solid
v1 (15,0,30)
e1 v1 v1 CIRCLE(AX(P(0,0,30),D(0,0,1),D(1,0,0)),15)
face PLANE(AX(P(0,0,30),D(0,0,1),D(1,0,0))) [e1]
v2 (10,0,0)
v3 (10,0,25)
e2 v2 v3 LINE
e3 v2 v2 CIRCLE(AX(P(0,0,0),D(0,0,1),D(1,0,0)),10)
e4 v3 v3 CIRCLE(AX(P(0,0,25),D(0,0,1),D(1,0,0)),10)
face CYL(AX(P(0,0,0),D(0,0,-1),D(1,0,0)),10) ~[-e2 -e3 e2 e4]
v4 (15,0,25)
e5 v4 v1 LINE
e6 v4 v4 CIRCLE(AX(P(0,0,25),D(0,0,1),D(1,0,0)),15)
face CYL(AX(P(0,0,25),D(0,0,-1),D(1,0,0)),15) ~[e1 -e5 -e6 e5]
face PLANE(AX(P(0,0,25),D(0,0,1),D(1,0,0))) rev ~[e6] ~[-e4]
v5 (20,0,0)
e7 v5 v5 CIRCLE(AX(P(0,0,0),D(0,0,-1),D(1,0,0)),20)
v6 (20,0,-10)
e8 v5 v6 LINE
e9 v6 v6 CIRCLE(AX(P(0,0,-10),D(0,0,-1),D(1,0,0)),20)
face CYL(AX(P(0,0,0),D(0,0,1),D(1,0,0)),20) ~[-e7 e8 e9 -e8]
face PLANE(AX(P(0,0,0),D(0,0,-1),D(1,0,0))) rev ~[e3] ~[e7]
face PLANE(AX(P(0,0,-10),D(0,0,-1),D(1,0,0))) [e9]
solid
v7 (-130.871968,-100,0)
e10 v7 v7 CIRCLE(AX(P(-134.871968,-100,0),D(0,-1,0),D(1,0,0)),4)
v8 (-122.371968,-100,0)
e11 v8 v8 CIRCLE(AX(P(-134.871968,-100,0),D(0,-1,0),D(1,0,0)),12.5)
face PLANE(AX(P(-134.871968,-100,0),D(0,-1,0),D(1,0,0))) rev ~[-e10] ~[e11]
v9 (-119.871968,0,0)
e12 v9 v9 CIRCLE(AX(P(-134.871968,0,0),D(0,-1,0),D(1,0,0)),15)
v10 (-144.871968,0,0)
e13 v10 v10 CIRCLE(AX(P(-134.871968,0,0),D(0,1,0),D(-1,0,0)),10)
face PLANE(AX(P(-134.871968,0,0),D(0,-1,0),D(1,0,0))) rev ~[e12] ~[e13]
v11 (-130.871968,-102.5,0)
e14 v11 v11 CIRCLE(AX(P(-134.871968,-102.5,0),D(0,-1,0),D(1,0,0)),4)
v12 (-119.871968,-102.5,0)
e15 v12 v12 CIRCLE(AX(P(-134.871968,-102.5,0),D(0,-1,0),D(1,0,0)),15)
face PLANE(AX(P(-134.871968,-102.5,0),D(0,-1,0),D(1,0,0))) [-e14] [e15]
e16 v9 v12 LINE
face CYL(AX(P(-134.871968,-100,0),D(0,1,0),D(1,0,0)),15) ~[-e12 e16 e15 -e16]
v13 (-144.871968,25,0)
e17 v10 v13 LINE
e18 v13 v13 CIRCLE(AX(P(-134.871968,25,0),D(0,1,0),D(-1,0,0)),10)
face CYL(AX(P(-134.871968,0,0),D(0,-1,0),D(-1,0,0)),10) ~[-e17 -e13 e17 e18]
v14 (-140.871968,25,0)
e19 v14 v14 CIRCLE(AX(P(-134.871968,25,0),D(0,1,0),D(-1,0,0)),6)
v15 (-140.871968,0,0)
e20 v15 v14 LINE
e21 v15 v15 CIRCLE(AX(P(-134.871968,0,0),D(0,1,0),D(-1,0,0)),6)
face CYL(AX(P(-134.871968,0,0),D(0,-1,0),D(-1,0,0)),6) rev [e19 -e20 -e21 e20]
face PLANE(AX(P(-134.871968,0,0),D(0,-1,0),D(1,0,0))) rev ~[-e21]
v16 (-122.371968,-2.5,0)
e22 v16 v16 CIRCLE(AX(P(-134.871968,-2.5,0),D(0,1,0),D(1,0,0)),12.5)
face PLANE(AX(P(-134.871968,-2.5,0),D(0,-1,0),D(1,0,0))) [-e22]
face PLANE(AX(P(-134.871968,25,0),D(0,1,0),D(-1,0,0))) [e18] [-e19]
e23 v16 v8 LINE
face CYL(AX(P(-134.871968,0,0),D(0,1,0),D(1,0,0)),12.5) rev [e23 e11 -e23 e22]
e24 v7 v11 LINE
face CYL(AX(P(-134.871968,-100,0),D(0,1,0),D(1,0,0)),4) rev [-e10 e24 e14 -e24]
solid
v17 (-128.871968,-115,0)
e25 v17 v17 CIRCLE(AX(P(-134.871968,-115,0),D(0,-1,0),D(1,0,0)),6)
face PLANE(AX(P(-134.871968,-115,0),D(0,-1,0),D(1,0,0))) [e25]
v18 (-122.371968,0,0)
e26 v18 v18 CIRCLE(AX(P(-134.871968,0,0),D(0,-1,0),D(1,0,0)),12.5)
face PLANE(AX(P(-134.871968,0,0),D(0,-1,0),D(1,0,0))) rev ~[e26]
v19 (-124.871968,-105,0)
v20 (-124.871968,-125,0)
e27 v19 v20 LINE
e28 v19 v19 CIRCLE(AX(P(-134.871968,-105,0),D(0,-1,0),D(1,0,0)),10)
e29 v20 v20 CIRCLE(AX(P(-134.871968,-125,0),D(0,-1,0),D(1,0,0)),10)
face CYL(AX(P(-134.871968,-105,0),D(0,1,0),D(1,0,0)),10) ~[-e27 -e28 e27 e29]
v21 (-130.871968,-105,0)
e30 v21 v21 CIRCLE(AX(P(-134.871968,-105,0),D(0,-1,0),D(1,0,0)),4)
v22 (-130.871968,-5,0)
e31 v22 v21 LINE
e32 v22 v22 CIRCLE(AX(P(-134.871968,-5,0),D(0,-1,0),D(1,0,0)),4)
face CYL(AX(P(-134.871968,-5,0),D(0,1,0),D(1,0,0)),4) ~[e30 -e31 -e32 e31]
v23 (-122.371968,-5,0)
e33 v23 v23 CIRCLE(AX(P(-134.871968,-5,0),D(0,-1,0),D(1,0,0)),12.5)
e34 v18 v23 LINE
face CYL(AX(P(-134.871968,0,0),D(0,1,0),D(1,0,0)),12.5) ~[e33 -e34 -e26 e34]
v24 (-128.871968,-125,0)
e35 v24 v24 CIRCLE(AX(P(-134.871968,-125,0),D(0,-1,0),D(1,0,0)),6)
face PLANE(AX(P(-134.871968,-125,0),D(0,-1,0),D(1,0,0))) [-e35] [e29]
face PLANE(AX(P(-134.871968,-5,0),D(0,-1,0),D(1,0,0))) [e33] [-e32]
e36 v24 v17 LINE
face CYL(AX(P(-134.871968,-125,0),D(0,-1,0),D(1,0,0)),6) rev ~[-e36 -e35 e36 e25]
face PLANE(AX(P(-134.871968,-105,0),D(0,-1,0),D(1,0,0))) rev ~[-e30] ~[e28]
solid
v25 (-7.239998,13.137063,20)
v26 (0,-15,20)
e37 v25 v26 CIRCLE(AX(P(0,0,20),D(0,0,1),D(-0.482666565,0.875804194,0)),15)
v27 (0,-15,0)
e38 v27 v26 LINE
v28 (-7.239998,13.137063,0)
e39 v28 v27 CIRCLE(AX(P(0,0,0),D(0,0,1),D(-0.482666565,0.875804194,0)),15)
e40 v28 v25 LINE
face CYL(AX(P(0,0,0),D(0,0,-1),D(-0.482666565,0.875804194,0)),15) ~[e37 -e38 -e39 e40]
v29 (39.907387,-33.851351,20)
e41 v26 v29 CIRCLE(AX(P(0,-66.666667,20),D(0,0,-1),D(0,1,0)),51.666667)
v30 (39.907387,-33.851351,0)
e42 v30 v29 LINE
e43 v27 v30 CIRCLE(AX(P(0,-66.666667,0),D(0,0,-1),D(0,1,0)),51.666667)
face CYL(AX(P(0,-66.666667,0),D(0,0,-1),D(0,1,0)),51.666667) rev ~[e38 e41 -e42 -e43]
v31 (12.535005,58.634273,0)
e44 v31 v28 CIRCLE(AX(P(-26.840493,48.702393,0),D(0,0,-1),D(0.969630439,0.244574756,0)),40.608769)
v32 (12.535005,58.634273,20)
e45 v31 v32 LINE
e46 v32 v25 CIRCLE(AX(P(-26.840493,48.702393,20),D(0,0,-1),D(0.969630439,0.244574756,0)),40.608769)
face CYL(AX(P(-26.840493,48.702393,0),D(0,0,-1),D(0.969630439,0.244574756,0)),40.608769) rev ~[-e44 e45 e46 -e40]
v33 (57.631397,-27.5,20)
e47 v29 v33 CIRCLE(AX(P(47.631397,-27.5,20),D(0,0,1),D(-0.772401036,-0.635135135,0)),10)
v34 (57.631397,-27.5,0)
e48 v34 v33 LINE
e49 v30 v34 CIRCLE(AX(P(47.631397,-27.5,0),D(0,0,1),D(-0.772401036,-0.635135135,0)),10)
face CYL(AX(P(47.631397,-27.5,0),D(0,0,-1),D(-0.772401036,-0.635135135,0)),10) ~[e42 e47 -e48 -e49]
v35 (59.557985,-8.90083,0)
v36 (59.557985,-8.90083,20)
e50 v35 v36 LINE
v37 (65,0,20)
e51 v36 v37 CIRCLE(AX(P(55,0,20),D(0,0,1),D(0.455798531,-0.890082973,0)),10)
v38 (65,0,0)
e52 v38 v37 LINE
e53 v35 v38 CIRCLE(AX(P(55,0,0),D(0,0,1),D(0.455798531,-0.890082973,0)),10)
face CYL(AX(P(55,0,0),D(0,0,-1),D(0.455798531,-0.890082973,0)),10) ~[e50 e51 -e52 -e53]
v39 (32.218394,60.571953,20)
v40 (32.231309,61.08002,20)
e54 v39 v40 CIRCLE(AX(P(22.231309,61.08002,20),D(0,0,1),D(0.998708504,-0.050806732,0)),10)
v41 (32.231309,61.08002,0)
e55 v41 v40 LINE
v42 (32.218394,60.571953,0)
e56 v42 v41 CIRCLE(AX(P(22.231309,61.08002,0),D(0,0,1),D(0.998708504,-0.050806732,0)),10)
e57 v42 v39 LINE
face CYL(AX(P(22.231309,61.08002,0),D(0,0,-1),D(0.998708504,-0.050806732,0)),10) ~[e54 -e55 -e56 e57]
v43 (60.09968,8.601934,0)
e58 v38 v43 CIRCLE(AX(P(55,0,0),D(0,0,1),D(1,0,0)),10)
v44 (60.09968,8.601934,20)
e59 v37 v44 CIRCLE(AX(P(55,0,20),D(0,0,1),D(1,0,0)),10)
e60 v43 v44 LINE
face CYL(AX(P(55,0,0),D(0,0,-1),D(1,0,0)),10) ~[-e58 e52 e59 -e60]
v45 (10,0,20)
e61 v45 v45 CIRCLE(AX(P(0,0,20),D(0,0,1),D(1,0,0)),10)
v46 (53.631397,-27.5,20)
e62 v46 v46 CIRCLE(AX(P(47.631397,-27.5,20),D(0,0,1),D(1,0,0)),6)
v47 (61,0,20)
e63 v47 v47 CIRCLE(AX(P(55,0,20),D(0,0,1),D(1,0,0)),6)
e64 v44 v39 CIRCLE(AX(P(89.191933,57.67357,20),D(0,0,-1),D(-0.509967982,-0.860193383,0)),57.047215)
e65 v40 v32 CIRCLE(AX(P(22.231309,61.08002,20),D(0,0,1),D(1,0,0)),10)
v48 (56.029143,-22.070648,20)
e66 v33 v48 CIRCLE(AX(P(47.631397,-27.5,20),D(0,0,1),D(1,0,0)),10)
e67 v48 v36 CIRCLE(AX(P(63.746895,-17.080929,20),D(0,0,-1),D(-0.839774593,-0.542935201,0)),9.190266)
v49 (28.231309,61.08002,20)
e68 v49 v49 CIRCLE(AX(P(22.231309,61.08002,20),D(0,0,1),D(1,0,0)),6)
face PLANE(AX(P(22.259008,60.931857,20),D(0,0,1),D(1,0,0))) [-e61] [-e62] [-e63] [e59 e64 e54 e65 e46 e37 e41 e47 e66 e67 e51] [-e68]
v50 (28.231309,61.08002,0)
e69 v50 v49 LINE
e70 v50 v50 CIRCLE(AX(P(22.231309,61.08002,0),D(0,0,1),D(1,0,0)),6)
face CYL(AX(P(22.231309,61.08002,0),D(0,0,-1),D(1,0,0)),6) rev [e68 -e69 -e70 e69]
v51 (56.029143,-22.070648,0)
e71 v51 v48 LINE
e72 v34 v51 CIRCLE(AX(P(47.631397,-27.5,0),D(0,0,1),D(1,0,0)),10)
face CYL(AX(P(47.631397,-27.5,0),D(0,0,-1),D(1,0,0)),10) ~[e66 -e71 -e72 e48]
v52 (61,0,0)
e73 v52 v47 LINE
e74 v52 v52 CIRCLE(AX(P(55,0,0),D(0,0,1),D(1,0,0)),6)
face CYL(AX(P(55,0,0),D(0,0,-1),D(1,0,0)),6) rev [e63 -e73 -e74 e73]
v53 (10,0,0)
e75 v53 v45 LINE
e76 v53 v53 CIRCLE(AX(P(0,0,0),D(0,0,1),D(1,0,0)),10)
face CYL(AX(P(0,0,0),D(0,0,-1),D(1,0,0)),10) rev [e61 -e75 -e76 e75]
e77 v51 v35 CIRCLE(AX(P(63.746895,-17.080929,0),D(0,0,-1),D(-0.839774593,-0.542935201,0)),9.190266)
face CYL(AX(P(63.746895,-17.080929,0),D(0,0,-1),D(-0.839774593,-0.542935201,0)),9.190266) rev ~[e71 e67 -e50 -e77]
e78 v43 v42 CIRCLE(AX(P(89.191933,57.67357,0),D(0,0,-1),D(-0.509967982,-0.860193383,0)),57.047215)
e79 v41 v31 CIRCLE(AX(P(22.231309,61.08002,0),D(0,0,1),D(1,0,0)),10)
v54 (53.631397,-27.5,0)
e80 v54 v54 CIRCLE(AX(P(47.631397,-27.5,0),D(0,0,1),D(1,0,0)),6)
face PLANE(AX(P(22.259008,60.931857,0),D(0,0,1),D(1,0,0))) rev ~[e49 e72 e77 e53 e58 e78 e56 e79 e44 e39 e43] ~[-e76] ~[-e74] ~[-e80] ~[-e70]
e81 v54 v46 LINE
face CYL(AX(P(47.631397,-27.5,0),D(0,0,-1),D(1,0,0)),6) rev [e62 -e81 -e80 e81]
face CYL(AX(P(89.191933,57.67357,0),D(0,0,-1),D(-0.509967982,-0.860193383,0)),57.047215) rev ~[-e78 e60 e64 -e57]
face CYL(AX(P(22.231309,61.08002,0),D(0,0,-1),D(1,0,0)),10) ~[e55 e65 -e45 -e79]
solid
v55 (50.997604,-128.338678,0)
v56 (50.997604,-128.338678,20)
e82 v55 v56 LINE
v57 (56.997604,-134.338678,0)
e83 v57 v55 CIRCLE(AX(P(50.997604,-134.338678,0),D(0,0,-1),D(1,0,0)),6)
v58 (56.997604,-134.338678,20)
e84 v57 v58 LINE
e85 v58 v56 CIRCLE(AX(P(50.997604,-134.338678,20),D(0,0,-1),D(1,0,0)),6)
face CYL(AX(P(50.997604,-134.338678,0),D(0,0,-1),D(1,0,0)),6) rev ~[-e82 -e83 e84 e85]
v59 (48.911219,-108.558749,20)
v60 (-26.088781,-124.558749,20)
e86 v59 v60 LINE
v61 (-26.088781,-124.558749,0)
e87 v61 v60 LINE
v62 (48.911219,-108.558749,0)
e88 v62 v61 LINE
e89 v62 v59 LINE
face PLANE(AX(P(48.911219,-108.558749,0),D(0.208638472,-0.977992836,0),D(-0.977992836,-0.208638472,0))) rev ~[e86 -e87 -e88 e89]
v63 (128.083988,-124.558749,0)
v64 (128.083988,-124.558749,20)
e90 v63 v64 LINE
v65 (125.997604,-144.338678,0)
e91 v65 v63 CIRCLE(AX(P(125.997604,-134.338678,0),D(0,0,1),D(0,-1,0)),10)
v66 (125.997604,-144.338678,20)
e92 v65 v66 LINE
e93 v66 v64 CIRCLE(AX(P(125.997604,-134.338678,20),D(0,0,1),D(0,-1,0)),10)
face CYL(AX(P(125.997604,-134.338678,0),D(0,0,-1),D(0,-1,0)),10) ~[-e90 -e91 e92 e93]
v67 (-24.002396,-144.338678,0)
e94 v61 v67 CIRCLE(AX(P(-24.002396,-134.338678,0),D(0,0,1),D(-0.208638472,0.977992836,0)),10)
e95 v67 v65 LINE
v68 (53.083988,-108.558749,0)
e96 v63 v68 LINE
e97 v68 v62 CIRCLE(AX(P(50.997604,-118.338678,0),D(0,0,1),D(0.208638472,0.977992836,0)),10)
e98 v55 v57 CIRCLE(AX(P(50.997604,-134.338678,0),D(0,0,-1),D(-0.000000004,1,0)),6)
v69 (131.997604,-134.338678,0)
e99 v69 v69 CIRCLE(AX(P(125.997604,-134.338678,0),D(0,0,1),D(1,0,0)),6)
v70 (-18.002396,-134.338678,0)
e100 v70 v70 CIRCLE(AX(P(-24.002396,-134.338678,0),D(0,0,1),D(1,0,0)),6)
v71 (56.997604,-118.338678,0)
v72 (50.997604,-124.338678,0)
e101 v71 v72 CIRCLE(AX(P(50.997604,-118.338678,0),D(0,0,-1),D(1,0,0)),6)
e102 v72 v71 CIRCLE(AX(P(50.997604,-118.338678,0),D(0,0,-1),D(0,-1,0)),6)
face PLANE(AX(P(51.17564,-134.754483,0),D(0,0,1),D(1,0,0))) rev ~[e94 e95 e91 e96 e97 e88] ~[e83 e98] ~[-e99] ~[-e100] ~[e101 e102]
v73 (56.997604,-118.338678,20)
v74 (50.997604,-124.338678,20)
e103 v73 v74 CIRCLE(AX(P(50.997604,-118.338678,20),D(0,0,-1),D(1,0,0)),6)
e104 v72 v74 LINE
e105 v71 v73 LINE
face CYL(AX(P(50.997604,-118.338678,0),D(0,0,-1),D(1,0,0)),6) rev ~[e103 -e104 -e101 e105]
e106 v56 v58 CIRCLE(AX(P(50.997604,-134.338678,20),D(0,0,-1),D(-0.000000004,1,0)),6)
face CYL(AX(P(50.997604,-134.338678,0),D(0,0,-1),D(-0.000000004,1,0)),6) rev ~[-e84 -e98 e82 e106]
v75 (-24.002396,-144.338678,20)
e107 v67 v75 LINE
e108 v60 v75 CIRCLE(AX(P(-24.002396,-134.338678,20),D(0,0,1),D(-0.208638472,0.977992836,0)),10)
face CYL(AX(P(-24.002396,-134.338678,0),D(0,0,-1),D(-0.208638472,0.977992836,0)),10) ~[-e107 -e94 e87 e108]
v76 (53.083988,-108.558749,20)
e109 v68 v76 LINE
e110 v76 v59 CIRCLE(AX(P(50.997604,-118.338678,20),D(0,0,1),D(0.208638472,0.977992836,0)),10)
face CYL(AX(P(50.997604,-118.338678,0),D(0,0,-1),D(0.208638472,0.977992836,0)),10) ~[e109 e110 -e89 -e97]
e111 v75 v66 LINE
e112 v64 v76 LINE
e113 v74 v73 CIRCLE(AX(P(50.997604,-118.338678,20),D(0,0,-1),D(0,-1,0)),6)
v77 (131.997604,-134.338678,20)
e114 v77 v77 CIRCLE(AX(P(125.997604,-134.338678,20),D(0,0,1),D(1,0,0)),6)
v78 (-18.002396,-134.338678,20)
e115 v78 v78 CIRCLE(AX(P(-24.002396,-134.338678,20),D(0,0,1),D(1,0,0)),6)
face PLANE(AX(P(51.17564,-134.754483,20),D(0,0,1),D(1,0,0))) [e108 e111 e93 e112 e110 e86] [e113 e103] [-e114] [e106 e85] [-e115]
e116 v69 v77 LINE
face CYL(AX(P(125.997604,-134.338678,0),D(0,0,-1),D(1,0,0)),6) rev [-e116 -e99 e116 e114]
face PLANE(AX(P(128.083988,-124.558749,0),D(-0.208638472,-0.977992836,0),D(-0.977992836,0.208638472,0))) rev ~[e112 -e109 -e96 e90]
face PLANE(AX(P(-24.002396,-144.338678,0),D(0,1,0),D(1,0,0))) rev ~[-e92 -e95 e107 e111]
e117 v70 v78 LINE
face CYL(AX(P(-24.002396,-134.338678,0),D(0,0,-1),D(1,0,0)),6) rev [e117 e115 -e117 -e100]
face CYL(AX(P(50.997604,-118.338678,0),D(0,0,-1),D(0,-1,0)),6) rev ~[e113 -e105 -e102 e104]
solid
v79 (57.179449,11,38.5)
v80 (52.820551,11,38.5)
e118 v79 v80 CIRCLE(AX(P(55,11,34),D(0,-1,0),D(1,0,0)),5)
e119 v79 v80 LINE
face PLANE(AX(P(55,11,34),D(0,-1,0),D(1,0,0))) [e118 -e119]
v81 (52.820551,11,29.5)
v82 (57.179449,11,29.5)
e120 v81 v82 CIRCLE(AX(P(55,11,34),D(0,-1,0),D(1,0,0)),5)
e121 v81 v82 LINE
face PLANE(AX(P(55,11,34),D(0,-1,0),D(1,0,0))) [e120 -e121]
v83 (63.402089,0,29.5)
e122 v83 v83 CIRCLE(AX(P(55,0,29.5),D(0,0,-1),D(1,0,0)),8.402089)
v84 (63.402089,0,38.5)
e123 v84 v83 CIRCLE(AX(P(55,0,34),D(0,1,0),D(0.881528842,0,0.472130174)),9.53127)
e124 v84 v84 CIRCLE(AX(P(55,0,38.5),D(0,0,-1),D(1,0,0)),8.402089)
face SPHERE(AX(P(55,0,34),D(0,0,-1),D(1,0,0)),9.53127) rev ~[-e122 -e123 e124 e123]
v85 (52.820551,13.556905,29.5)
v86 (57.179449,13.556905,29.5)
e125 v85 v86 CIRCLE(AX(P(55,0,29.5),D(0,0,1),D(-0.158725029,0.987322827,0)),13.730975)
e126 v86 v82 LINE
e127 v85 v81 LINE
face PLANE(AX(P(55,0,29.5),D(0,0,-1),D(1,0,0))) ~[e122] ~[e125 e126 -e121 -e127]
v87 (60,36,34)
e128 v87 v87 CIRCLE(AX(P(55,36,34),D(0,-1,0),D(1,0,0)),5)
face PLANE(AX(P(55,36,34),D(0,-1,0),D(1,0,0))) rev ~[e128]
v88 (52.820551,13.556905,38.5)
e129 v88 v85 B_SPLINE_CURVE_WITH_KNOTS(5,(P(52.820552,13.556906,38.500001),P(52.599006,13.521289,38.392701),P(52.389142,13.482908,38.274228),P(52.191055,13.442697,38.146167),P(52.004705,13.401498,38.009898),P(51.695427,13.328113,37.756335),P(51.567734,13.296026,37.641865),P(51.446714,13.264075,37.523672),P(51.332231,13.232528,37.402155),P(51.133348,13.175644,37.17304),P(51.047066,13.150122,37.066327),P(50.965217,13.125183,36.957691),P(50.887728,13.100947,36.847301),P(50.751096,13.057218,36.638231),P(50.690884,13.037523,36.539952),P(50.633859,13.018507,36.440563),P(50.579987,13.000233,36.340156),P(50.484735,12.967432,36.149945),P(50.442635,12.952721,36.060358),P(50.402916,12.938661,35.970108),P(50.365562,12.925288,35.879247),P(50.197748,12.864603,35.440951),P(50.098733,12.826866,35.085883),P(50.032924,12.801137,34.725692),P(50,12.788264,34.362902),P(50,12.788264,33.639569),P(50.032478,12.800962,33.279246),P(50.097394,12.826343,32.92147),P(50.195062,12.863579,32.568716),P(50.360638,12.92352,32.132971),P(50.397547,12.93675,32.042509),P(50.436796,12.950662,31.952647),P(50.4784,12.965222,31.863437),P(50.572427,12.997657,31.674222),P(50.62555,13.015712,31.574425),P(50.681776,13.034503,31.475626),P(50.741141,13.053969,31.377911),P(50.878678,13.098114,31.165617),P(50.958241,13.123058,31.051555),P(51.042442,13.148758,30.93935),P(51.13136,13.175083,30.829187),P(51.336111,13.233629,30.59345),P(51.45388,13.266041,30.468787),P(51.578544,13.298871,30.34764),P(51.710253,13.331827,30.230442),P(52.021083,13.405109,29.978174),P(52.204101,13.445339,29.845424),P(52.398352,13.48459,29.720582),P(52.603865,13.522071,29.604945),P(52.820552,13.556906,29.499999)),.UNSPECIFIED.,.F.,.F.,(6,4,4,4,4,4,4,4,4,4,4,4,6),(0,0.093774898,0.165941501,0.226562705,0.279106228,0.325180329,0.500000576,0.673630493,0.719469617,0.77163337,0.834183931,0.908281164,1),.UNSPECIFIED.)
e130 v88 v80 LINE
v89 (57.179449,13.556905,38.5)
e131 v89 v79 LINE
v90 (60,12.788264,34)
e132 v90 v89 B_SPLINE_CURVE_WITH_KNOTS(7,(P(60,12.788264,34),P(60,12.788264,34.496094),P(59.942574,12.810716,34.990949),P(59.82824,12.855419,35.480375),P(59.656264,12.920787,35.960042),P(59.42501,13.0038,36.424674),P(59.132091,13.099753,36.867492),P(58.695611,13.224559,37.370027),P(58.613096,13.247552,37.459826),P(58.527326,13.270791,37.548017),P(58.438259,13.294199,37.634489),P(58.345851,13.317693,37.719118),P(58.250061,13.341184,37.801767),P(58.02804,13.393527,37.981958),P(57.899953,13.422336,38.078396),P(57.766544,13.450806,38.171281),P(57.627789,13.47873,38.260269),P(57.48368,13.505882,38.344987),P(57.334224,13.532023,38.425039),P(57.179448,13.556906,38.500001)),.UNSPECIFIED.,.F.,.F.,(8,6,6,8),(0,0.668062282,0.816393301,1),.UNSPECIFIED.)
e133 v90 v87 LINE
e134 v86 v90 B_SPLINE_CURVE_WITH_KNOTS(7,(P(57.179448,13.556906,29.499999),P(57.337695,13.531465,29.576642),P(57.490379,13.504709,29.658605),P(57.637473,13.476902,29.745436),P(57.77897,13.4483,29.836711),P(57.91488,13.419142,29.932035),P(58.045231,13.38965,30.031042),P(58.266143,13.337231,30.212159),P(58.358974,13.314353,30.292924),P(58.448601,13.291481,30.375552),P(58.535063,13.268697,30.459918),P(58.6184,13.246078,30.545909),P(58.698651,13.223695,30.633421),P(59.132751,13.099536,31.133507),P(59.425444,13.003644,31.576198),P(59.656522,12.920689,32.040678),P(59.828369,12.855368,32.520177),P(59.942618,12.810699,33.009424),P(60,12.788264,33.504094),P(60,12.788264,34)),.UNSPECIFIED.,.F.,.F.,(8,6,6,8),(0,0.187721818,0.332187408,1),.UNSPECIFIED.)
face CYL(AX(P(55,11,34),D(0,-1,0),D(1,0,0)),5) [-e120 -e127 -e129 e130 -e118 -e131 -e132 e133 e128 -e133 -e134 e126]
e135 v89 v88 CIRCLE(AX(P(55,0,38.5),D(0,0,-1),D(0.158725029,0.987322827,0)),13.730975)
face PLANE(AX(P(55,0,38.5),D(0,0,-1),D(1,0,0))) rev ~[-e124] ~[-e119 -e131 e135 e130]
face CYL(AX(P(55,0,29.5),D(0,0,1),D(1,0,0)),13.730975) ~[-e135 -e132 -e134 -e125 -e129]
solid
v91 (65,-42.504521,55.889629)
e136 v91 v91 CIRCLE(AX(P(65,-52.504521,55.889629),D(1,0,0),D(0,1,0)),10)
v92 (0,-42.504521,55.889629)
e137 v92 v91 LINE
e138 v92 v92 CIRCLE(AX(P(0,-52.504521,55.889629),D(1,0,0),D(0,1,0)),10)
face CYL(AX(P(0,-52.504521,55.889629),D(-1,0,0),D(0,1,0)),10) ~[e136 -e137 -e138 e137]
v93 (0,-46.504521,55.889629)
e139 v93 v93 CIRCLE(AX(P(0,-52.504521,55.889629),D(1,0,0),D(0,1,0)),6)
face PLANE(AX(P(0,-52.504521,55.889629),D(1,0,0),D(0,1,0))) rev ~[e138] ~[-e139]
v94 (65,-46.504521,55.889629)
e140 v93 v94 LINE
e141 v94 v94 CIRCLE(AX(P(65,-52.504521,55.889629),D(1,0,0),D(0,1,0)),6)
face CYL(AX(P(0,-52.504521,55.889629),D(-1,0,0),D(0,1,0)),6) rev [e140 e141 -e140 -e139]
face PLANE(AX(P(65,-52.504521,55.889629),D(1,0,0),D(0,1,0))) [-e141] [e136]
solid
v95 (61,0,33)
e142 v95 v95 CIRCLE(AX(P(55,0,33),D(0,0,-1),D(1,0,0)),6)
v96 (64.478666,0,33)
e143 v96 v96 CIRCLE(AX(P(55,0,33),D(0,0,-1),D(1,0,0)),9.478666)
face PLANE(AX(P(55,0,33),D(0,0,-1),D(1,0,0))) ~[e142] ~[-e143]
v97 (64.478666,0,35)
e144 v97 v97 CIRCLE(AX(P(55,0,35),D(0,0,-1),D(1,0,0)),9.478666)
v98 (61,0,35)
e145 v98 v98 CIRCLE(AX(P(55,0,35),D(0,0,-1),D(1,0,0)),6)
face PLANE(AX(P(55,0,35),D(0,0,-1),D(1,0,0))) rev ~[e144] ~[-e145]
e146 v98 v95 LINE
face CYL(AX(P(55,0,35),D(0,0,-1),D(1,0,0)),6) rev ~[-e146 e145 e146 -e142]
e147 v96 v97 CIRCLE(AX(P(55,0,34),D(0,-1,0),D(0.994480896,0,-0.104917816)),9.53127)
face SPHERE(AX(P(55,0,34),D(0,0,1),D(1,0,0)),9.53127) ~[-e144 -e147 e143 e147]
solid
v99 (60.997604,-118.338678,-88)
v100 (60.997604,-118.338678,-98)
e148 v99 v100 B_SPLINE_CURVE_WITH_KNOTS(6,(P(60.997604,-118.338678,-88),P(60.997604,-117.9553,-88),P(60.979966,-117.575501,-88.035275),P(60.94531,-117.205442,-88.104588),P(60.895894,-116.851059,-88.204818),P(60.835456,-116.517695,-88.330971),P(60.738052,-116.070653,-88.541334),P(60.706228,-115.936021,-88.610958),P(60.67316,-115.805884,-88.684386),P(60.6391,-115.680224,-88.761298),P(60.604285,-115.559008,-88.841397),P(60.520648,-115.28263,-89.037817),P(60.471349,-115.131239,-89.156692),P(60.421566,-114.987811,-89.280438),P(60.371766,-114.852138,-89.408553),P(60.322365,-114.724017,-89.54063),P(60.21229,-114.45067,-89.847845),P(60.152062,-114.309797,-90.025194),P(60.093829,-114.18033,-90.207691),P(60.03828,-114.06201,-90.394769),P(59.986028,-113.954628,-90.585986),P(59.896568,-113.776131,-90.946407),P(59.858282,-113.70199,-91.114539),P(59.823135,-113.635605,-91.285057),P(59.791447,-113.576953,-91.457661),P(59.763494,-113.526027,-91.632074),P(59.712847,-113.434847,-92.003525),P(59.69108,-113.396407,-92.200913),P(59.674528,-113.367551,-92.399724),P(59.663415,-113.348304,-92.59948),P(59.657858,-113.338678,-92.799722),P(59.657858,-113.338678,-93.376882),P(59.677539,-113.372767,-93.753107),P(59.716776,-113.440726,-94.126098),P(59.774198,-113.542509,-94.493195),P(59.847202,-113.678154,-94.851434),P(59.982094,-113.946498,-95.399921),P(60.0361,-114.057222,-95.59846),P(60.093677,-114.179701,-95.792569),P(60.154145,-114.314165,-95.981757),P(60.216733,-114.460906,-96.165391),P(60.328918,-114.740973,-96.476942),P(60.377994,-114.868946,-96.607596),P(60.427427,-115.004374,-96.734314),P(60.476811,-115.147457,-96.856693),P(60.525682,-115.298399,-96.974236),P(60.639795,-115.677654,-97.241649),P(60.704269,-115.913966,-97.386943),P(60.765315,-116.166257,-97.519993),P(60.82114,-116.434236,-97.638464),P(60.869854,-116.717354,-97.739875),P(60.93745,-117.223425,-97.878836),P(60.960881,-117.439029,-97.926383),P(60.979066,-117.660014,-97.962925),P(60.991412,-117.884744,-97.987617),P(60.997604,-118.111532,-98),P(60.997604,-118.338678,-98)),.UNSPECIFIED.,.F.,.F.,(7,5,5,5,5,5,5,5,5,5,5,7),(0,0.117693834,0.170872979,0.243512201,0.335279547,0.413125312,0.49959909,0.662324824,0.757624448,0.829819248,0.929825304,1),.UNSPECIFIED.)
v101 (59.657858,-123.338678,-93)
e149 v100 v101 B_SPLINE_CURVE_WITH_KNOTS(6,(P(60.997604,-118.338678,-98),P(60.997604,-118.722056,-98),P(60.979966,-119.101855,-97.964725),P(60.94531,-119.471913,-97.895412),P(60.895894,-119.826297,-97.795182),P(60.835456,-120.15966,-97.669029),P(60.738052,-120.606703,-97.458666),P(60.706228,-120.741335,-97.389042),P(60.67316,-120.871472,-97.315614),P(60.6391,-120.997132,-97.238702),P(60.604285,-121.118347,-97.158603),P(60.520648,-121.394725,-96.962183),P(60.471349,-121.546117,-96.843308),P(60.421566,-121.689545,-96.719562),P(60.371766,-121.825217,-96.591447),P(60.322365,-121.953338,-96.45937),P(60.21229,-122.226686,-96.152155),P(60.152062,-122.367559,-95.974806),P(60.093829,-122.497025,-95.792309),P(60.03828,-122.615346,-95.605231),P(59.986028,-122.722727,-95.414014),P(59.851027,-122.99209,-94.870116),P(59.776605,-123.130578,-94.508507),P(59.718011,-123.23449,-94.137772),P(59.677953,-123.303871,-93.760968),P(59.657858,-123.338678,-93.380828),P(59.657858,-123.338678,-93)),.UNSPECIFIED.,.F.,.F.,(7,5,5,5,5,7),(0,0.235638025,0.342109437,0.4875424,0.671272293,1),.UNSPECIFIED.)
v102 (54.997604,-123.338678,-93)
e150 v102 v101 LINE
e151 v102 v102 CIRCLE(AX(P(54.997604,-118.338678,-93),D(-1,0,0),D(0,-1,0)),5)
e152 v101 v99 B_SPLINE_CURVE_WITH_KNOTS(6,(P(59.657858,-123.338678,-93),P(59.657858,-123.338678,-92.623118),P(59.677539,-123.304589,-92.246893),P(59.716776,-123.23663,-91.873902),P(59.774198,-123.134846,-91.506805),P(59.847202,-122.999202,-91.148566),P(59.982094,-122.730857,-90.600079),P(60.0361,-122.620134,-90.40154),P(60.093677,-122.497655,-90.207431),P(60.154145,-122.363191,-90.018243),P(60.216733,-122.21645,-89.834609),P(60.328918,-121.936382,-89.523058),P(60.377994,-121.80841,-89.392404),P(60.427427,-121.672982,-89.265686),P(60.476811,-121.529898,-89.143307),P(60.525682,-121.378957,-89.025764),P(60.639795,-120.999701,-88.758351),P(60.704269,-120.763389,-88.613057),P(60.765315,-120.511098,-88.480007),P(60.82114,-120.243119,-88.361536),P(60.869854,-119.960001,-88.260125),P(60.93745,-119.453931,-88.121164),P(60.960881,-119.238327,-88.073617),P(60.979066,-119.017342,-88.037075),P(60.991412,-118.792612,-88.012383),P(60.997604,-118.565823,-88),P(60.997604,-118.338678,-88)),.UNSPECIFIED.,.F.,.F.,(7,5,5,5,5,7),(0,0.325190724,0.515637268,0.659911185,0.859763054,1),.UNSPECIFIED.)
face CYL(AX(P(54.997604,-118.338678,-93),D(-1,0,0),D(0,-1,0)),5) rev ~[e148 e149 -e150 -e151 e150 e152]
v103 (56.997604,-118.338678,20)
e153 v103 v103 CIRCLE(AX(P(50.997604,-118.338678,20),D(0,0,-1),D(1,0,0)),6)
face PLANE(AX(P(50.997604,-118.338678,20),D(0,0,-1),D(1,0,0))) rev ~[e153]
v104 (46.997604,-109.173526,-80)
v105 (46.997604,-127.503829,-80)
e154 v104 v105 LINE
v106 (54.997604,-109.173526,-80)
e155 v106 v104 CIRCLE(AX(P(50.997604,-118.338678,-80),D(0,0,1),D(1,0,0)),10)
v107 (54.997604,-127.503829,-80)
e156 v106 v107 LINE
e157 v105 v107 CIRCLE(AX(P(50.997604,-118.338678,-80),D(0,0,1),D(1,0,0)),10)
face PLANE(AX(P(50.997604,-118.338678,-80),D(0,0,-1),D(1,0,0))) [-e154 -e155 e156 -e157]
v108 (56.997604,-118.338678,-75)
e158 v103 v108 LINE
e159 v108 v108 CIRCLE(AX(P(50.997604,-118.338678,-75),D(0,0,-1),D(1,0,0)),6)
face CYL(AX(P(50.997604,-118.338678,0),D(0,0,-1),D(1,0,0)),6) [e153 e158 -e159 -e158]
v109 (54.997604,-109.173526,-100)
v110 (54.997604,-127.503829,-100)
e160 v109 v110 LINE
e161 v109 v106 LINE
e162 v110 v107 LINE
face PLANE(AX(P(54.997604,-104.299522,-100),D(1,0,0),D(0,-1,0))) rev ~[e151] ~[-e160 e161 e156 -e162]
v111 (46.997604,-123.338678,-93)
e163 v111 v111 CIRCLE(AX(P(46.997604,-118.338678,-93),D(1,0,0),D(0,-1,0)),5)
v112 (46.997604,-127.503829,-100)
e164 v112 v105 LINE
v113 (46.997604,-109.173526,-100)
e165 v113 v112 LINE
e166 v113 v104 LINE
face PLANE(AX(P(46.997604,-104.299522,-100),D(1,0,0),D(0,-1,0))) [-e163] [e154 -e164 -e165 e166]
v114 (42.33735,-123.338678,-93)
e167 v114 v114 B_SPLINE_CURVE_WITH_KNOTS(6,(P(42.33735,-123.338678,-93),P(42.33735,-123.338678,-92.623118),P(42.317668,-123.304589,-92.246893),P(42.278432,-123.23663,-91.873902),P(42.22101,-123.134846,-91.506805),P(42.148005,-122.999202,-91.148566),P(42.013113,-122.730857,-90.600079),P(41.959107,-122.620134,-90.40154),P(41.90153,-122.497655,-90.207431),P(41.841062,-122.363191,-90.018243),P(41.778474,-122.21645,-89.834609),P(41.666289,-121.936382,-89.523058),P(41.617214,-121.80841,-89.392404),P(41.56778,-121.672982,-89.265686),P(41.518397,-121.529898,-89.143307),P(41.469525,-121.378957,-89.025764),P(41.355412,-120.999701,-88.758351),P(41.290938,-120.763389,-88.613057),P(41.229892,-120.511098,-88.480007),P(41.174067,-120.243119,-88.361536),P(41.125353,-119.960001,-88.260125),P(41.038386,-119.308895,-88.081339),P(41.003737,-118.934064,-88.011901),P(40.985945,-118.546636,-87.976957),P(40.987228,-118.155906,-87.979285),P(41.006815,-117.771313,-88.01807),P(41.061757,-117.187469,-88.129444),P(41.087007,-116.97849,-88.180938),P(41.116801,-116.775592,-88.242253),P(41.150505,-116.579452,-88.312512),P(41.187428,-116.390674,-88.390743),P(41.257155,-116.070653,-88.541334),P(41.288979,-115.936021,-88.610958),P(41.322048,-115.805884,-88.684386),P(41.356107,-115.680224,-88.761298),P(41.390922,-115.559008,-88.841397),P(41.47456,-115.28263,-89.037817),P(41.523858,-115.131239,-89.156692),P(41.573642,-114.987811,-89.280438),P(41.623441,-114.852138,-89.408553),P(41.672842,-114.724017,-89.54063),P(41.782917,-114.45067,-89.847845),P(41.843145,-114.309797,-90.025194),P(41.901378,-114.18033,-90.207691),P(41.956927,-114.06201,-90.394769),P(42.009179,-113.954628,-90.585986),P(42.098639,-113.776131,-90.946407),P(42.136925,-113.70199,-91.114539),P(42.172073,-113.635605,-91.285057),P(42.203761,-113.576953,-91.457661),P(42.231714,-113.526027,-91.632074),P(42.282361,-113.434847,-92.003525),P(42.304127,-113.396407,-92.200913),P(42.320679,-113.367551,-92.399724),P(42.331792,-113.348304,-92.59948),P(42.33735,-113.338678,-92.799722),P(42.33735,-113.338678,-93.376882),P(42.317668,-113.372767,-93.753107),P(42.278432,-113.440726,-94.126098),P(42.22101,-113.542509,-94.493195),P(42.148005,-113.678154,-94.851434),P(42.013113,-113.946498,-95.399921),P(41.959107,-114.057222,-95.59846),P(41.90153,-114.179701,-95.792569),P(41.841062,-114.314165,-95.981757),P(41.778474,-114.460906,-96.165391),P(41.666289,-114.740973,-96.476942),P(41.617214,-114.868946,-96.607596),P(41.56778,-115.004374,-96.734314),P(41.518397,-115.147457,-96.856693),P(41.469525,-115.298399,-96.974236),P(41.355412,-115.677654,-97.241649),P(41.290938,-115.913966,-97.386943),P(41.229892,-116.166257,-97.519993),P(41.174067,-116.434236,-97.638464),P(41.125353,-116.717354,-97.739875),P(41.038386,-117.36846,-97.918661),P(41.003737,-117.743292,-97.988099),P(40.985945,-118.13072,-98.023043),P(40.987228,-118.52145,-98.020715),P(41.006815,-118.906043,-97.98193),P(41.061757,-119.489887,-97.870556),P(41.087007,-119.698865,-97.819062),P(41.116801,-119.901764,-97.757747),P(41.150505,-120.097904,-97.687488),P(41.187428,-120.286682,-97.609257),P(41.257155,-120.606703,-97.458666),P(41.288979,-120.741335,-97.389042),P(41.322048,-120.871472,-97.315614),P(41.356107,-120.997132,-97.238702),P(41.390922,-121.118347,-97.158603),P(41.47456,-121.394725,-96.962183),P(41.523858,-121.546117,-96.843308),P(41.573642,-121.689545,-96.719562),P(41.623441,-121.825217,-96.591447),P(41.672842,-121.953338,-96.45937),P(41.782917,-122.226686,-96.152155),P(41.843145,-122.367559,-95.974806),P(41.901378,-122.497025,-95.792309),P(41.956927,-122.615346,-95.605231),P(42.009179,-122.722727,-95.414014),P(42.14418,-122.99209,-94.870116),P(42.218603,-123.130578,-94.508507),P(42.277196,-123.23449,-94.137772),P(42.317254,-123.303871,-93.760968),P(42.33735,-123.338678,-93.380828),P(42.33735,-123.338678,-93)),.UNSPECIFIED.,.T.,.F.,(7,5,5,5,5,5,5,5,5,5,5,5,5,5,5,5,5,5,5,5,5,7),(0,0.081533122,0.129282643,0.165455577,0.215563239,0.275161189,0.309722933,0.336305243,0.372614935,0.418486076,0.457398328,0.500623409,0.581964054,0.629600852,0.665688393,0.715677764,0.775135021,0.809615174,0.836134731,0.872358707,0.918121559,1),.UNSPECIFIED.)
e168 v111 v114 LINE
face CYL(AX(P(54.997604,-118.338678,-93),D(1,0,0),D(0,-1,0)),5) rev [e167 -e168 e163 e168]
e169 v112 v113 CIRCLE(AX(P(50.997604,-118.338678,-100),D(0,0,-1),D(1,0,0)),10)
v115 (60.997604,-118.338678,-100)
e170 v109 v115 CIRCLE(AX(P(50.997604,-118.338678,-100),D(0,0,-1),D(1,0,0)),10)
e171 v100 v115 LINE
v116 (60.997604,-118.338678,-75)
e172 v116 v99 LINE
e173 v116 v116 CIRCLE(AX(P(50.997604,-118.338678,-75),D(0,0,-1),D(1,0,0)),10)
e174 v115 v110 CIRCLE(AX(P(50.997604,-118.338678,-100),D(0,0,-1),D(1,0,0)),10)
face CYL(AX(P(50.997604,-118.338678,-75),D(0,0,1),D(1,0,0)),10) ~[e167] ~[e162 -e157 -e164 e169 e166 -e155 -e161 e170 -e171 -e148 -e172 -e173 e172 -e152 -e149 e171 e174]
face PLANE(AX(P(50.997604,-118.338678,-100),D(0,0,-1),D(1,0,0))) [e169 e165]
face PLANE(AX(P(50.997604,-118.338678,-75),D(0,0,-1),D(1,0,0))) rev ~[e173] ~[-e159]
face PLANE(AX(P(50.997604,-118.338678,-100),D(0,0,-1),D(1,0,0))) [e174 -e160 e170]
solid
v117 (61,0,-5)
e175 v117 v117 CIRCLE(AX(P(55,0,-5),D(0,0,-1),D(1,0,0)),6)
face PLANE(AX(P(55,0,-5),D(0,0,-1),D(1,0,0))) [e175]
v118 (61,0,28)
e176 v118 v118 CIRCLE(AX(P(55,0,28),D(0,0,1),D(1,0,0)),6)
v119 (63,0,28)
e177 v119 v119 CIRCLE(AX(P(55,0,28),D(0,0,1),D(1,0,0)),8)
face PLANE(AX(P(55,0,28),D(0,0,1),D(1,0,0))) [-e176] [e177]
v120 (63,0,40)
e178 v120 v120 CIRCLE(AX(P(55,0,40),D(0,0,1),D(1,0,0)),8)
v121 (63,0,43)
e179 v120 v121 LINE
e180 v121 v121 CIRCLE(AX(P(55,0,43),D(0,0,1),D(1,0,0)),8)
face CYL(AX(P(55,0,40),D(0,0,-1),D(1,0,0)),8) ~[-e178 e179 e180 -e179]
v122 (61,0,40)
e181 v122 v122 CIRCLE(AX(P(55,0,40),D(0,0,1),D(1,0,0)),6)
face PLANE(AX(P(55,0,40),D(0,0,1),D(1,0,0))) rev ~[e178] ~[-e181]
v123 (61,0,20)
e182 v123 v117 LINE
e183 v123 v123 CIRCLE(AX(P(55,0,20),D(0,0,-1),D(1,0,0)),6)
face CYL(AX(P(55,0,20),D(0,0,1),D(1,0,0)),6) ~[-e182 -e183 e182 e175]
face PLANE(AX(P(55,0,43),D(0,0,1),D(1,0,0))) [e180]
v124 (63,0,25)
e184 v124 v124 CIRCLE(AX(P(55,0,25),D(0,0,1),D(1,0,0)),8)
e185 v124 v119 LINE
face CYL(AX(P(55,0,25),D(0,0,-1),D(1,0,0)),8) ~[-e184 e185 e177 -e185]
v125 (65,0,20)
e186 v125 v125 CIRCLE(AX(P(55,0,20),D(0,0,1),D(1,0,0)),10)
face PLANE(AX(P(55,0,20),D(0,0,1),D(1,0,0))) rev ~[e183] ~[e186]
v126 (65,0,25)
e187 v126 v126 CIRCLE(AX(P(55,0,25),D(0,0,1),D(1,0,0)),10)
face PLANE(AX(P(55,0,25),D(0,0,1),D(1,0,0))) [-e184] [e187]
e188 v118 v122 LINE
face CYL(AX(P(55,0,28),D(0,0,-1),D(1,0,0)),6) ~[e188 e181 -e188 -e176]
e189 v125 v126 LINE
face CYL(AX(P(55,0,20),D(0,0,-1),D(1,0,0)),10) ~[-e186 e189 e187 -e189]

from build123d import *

# Parameters (mm, degrees)
F0_R           = 6
F0_R_2         = 10
F1_DEPTH       = 20
F2_R           = 20
F3_DEPTH       = 10
F4_R           = 10
F5_DEPTH       = 25
F6_R           = 15
F7_DEPTH       = 5
F8_R           = 10
F9_DEPTH       = 5
F10_R          = 8
F11_DEPTH      = 3
F12_R          = 6
F13_DEPTH      = 12
F14_R          = 8
F15_DEPTH      = 3
F16_R          = 6
F17_DEPTH      = 25
F23_R          = 5
F24_DEPTH      = 25
F25_R          = 15
F26_DEPTH      = 100
F27_T          = -2.5
F29_R          = 12.5
F30_DEPTH      = 5
F31_R          = 4
F32_DEPTH      = 100
F33_R          = 15
F33_R_2        = 4
F34_DEPTH      = 2.5
F35_R          = 10
F36_DEPTH      = 20
F38_R          = 6
F39_DEPTH      = 20
F40_R          = 6
F41_DEPTH      = 75
F41_DEPTH_BACK = 20
F42_R          = 10
F43_DEPTH      = 25
F44_W          = 8
F44_H          = 28.0783114423
F45_DEPTH      = 20
F46_R          = 5
F47_DEPTH      = 81.001
F47_DEPTH_BACK = 204.8705715287
F48_R          = 6
F49_DEPTH      = 10
F37_R          = 10
F37_R_2        = 6
F50_DEPTH      = 25
F51_R          = 10
F51_R_2        = 6
F52_DEPTH      = 65


with BuildPart() as f1:
    # F0 (on Top) → F1 (new body)
    with BuildSketch(Plane.XY):
        with BuildLine():
            ThreePointArc((32.2183943562, 60.5719530293), (32.2280800548, 60.8259046296), (32.2313093162, 61.0800203511))
            ThreePointArc((32.2313093162, 61.0800203511), (20.9990439055, 71.0038060177), (12.5350049246, 58.6342727871))
            ThreePointArc((12.5350049246, 58.6342727871), (23.2109978007, 51.1281255328), (32.2183943562, 60.5719530293))
        make_face()
        with Locations((22.2313093162, 61.0800203511)):
            Circle(F0_R, mode=Mode.SUBTRACT)
        with BuildLine():
            ThreePointArc((32.2183943562, 60.5719530293), (23.2109978007, 51.1281255328), (12.5350049246, 58.6342727871))
            ThreePointArc((12.5350049246, 58.6342727871), (10.4025055394, 32.5150172616), (-7.2399984812, 13.1370629135))
            ThreePointArc((-7.2399984812, 13.1370629135), (7.6288931957, 12.9151069918), (15, 0))
            ThreePointArc((15, 0), (10.6066017178, -10.6066017178), (0, -15))
            ThreePointArc((0, -15), (22.0679234012, -19.9499544407), (39.9073868501, -33.8513513514))
            ThreePointArc((39.9073868501, -33.8513513514), (41.731420698, -19.4259503853), (56.0291431418, -22.0706479914))
            ThreePointArc((56.0291431418, -22.0706479914), (54.8697797501, -14.7023131729), (59.5579853088, -8.9008297324))
            ThreePointArc((59.5579853088, -8.9008297324), (45.0047857915, 0.3093427334), (60.0996798249, 8.6019338339))
            ThreePointArc((60.0996798249, 8.6019338339), (38.9221522488, 30.7044424185), (32.2183943562, 60.5719530293))
        make_face()
        with BuildLine():
            ThreePointArc((15, 0), (7.6288931957, 12.9151069918), (-7.2399984812, 13.1370629135))
            ThreePointArc((-7.2399984812, 13.1370629135), (-14.5268018452, -3.737917622), (0, -15))
            ThreePointArc((0, -15), (10.6066017178, -10.6066017178), (15, 0))
        make_face()
        Circle(F0_R_2, mode=Mode.SUBTRACT)
        with BuildLine():
            ThreePointArc((65, 0), (63.688981478, 4.9499091785), (60.0996798249, 8.6019338339))
            ThreePointArc((60.0996798249, 8.6019338339), (45.0047857915, 0.3093427334), (59.5579853088, -8.9008297324))
            ThreePointArc((59.5579853088, -8.9008297324), (63.531701269, -5.2163275833), (65, 0))
        make_face()
        with Locations((55, 0)):
            Circle(F0_R, mode=Mode.SUBTRACT)
        with BuildLine():
            ThreePointArc((56.0291431418, -22.0706479914), (41.731420698, -19.4259503853), (39.9073868501, -33.8513513514))
            ThreePointArc((39.9073868501, -33.8513513514), (51.0048150906, -36.9138223794), (57.6313972081, -27.5))
            ThreePointArc((57.6313972081, -27.5), (57.2224727301, -24.6695812445), (56.0291431418, -22.0706479914))
        make_face()
        with Locations((47.6313972081, -27.5)):
            Circle(F0_R, mode=Mode.SUBTRACT)
    extrude(amount=F1_DEPTH)


with BuildPart() as f3:
    # F2 (on face) → F3 (new body)
    with BuildSketch(Plane(origin=(0, 0, 0), x_dir=(1, 0, 0), z_dir=(0, 0, -1))):
        Circle(F2_R)
    extrude(amount=F3_DEPTH)

    # F4 (on face) → F5 (join)
    with BuildSketch(Plane.XY):
        Circle(F4_R)
    extrude(amount=F5_DEPTH)

    # F6 (on face) → F7 (join)
    with BuildSketch(Plane.XY.offset(25)):
        Circle(F6_R)
    extrude(amount=F7_DEPTH)


with BuildPart() as f9:
    # F8 (on face) → F9 (new body)
    with BuildSketch(Plane.XY.offset(20)):
        with Locations((55, 0)):
            Circle(F8_R)
    extrude(amount=F9_DEPTH)

    # F10 (on face) → F11 (join)
    with BuildSketch(Plane.XY.offset(25)):
        with Locations((55, 0)):
            Circle(F10_R)
    extrude(amount=F11_DEPTH)

    # F12 (on face) → F13 (join)
    with BuildSketch(Plane.XY.offset(28)):
        with Locations((55, 0)):
            Circle(F12_R)
    extrude(amount=F13_DEPTH)

    # F14 (on face) → F15 (join)
    with BuildSketch(Plane.XY.offset(40)):
        with Locations((55, 0)):
            Circle(F14_R)
    extrude(amount=F15_DEPTH)

    # F16 (on face) → F17 (join)
    with BuildSketch(Plane(origin=(0, 0, 20), x_dir=(1, 0, 0), z_dir=(0, 0, -1))):
        with Locations((55, 0)):
            Circle(F16_R)
    extrude(amount=F17_DEPTH)


with BuildPart() as f19:
    # F18 (on Front) → F19 (revolve)
    with BuildSketch(Plane.XZ):
        with BuildLine():
            Line((64.4786655903, 35), (61, 35))
            Line((61, 35), (61, 33))
            Line((61, 33), (64.4786655903, 33))
            ThreePointArc((64.4786655903, 33), (64.5312696621, 34), (64.4786655903, 35))
        make_face()
    revolve(axis=Axis((55, 0, 34), (0, 0, -1)))


with BuildPart() as f21:
    # F20 (on Front) → F21 (revolve)
    with BuildSketch(Plane.XZ):
        with BuildLine():
            Line((68.7309754244, 38.5), (63.4020891076, 38.5))
            ThreePointArc((63.4020891076, 38.5), (64.5312696621, 34), (63.4020891076, 29.5))
            Line((63.4020891076, 29.5), (68.7309754244, 29.5))
            Line((68.7309754244, 29.5), (68.7309754244, 38.5))
        make_face()
    revolve(axis=Axis((55, 0, 33.1719050929), (0, 0, -1)))

    # F23 (on offset) → F24 (join)
    with BuildSketch(Plane.XZ.offset(-11)):
        with Locations((55, 34)):
            Circle(F23_R)
    extrude(amount=-F24_DEPTH)


with BuildPart() as f26:
    # F25 (on Front) → F26 (new body)
    with BuildSketch(Plane.XZ):
        with Locations((-134.871967846, 0)):
            Circle(F25_R)
    extrude(amount=F26_DEPTH)

    # F27
    f27_openings = [f26.faces().sort_by_distance(p)[0] for p in [
        (-134.871968, -100, 0),
    ]]
    offset(amount=F27_T, openings=f27_openings)

    # F33 (on face) → F34 (join)
    with BuildSketch(Plane.XZ.offset(100)):
        with Locations((-134.871967846, 0)):
            Circle(F33_R)
        with Locations((-134.871967846, 0)):
            Circle(F33_R_2, mode=Mode.SUBTRACT)
    extrude(amount=F34_DEPTH)

    # F37 (on face) → F50 (join)
    with BuildSketch(Plane(origin=(0, 0, 0), x_dir=(-1, 0, 0), z_dir=(0, 1, 0))):
        with Locations((134.871967846, 0)):
            Circle(F37_R)
        with Locations((134.871967846, 0)):
            Circle(F37_R_2, mode=Mode.SUBTRACT)
    extrude(amount=F50_DEPTH)


with BuildPart() as f30:
    # F29 (on offset) → F30 (new body)
    with BuildSketch(Plane.XZ):
        with Locations((-134.871967846, 0)):
            Circle(F29_R)
    extrude(amount=F30_DEPTH)

    # F31 (on face) → F32 (join)
    with BuildSketch(Plane.XZ.offset(5)):
        with Locations((-134.871967846, 0)):
            Circle(F31_R)
    extrude(amount=F32_DEPTH)

    # F35 (on face) → F36 (join)
    with BuildSketch(Plane.XZ.offset(105)):
        with Locations((-134.871967846, 0)):
            Circle(F35_R)
    extrude(amount=F36_DEPTH)

    # F48 (on face) → F49 (cut)
    with BuildSketch(Plane.XZ.offset(125)):
        with Locations((-134.871967846, 0)):
            Circle(F48_R)
    extrude(amount=-F49_DEPTH, mode=Mode.SUBTRACT)


with BuildPart() as f39:
    # F38 (on Top) → F39 (new body)
    with BuildSketch(Plane.XY):
        with BuildLine():
            ThreePointArc((56.9976036827, -126.3386778119), (54.1598813303, -127.8255107966), (50.9976036562, -128.3386778119))
            ThreePointArc((50.9976036562, -128.3386778119), (47.83532601, -127.8255107882), (44.9976036827, -126.3386778119))
            ThreePointArc((44.9976036827, -126.3386778119), (41.5107707022, -137.500955472), (50.9976036827, -144.3386778119))
            ThreePointArc((50.9976036827, -144.3386778119), (58.0686714946, -141.4097456237), (60.9976036827, -134.3386778119))
            ThreePointArc((60.9976036827, -134.3386778119), (59.9418755927, -129.8665418569), (56.9976036827, -126.3386778119))
        make_face()
        with BuildLine():
            ThreePointArc((50.9976036562, -128.3386778119), (55.2402443605, -130.0960371154), (56.9976036827, -134.3386778119))
            ThreePointArc((56.9976036827, -134.3386778119), (46.7549630049, -138.5813185083), (50.9976036562, -128.3386778119))
        make_face(mode=Mode.SUBTRACT)
        with BuildLine():
            ThreePointArc((48.911218965, -108.5587494476), (41.2313931786, -116.1889958843), (44.9976036827, -126.3386778119))
            ThreePointArc((44.9976036827, -126.3386778119), (47.8353260225, -124.8518448314), (50.9976036827, -124.3386778119))
            ThreePointArc((50.9976036827, -124.3386778119), (54.1598813429, -124.8518448314), (56.9976036827, -126.3386778119))
            ThreePointArc((56.9976036827, -126.3386778119), (59.9418755927, -122.8108137669), (60.9976036827, -118.3386778119))
            ThreePointArc((60.9976036827, -118.3386778119), (58.7714009266, -112.0483617299), (53.0839884004, -108.5587494476))
            ThreePointArc((53.0839884004, -108.5587494476), (50.9976036827, -108.3386778119), (48.911218965, -108.5587494476))
        make_face()
        with BuildLine():
            ThreePointArc((56.9976036827, -118.3386778119), (55.2402443698, -122.581318499), (50.9976036827, -124.3386778119))
            ThreePointArc((50.9976036827, -124.3386778119), (46.7549629956, -114.0960371248), (56.9976036827, -118.3386778119))
        make_face(mode=Mode.SUBTRACT)
        with BuildLine():
            ThreePointArc((50.9976036827, -144.3386778119), (41.5107707022, -137.500955472), (44.9976036827, -126.3386778119))
            ThreePointArc((44.9976036827, -126.3386778119), (41.2313931786, -116.1889958843), (48.911218965, -108.5587494476))
            Line((48.911218965, -108.5587494476), (-26.088781035, -124.5587494476))
            ThreePointArc((-26.088781035, -124.5587494476), (-17.7120802353, -126.564880568), (-14.0023963173, -134.3386778119))
            ThreePointArc((-14.0023963173, -134.3386778119), (-16.9313285054, -141.4097456237), (-24.0023963173, -144.3386778119))
            Line((-24.0023963173, -144.3386778119), (50.9976036827, -144.3386778119))
        make_face()
        with BuildLine():
            ThreePointArc((60.9976036827, -118.3386778119), (59.9418755927, -122.8108137669), (56.9976036827, -126.3386778119))
            ThreePointArc((56.9976036827, -126.3386778119), (59.9418755927, -129.8665418569), (60.9976036827, -134.3386778119))
            ThreePointArc((60.9976036827, -134.3386778119), (58.0686714946, -141.4097456237), (50.9976036827, -144.3386778119))
            Line((50.9976036827, -144.3386778119), (125.9976036827, -144.3386778119))
            ThreePointArc((125.9976036827, -144.3386778119), (116.0527737786, -133.2896982226), (128.0839884004, -124.5587494476))
            Line((128.0839884004, -124.5587494476), (53.0839884004, -108.5587494476))
            ThreePointArc((53.0839884004, -108.5587494476), (58.7714009266, -112.0483617299), (60.9976036827, -118.3386778119))
        make_face()
        with BuildLine():
            ThreePointArc((-26.088781035, -124.5587494476), (-33.9472262214, -135.3876574012), (-24.0023963173, -144.3386778119))
            ThreePointArc((-24.0023963173, -144.3386778119), (-16.9313285054, -141.4097456237), (-14.0023963173, -134.3386778119))
            ThreePointArc((-14.0023963173, -134.3386778119), (-17.7120802353, -126.564880568), (-26.088781035, -124.5587494476))
        make_face()
        with Locations((-24.0023963173, -134.3386778119)):
            Circle(F38_R, mode=Mode.SUBTRACT)
        with BuildLine():
            ThreePointArc((128.0839884004, -124.5587494476), (116.0527737786, -133.2896982226), (125.9976036827, -144.3386778119))
            ThreePointArc((125.9976036827, -144.3386778119), (133.0686714946, -141.4097456237), (135.9976036827, -134.3386778119))
            ThreePointArc((135.9976036827, -134.3386778119), (133.7714009266, -128.0483617299), (128.0839884004, -124.5587494476))
        make_face()
        with Locations((125.9976036827, -134.3386778119)):
            Circle(F38_R, mode=Mode.SUBTRACT)
        with BuildLine():
            ThreePointArc((44.9976036827, -126.3386778119), (47.83532601, -127.8255107882), (50.9976036562, -128.3386778119))
            ThreePointArc((50.9976036562, -128.3386778119), (54.1598813303, -127.8255107966), (56.9976036827, -126.3386778119))
            ThreePointArc((56.9976036827, -126.3386778119), (54.1598813429, -124.8518448314), (50.9976036827, -124.3386778119))
            ThreePointArc((50.9976036827, -124.3386778119), (47.8353260225, -124.8518448314), (44.9976036827, -126.3386778119))
        make_face()
    extrude(amount=F39_DEPTH)


with BuildPart() as f41:
    # F40 (on face) → F41 (new body, two sides)
    with BuildSketch(Plane(origin=(0, 0, 0), x_dir=(1, 0, 0), z_dir=(0, 0, -1))) as f41_sk:
        with Locations((50.9976036827, 118.3386778119)):
            Circle(F40_R)
    extrude(amount=F41_DEPTH)
    extrude(f41_sk.sketch, amount=-F41_DEPTH_BACK)

    # F42 (on face) → F43 (join)
    with BuildSketch(Plane(origin=(0, 0, -75), x_dir=(1, 0, 0), z_dir=(0, 0, -1))):
        with Locations((50.9976036827, 118.3386778119)):
            Circle(F42_R)
    extrude(amount=F43_DEPTH)

    # F44 (on face) → F45 (cut)
    with BuildSketch(Plane(origin=(0, 0, -100), x_dir=(1, 0, 0), z_dir=(0, 0, -1))):
        with Locations((50.9976036827, 118.3386778119)):
            Rectangle(F44_W, F44_H)
    extrude(amount=-F45_DEPTH, mode=Mode.SUBTRACT)

    # F46 (on face) → F47 (cut, two sides)
    with BuildSketch(Plane(origin=(54.9976036827, 0, 0), x_dir=(0, -1, 0), z_dir=(-1, 0, 0))) as f47_sk:
        with Locations((118.3386778119, -93)):
            Circle(F46_R)
    extrude(amount=-F47_DEPTH, mode=Mode.SUBTRACT)
    extrude(f47_sk.sketch, amount=F47_DEPTH_BACK, mode=Mode.SUBTRACT)


with BuildPart() as f52:
    # F51 (on Right) → F52 (new body)
    with BuildSketch(Plane.YZ):
        with Locations((-52.5045208633, 55.8896288276)):
            Circle(F51_R)
        with Locations((-52.5045208633, 55.8896288276)):
            Circle(F51_R_2, mode=Mode.SUBTRACT)
    extrude(amount=F52_DEPTH)


solid = Compound([f1.part, f3.part, f9.part, f19.part, f21.part, f26.part, f30.part, f39.part, f41.part, f52.part])
